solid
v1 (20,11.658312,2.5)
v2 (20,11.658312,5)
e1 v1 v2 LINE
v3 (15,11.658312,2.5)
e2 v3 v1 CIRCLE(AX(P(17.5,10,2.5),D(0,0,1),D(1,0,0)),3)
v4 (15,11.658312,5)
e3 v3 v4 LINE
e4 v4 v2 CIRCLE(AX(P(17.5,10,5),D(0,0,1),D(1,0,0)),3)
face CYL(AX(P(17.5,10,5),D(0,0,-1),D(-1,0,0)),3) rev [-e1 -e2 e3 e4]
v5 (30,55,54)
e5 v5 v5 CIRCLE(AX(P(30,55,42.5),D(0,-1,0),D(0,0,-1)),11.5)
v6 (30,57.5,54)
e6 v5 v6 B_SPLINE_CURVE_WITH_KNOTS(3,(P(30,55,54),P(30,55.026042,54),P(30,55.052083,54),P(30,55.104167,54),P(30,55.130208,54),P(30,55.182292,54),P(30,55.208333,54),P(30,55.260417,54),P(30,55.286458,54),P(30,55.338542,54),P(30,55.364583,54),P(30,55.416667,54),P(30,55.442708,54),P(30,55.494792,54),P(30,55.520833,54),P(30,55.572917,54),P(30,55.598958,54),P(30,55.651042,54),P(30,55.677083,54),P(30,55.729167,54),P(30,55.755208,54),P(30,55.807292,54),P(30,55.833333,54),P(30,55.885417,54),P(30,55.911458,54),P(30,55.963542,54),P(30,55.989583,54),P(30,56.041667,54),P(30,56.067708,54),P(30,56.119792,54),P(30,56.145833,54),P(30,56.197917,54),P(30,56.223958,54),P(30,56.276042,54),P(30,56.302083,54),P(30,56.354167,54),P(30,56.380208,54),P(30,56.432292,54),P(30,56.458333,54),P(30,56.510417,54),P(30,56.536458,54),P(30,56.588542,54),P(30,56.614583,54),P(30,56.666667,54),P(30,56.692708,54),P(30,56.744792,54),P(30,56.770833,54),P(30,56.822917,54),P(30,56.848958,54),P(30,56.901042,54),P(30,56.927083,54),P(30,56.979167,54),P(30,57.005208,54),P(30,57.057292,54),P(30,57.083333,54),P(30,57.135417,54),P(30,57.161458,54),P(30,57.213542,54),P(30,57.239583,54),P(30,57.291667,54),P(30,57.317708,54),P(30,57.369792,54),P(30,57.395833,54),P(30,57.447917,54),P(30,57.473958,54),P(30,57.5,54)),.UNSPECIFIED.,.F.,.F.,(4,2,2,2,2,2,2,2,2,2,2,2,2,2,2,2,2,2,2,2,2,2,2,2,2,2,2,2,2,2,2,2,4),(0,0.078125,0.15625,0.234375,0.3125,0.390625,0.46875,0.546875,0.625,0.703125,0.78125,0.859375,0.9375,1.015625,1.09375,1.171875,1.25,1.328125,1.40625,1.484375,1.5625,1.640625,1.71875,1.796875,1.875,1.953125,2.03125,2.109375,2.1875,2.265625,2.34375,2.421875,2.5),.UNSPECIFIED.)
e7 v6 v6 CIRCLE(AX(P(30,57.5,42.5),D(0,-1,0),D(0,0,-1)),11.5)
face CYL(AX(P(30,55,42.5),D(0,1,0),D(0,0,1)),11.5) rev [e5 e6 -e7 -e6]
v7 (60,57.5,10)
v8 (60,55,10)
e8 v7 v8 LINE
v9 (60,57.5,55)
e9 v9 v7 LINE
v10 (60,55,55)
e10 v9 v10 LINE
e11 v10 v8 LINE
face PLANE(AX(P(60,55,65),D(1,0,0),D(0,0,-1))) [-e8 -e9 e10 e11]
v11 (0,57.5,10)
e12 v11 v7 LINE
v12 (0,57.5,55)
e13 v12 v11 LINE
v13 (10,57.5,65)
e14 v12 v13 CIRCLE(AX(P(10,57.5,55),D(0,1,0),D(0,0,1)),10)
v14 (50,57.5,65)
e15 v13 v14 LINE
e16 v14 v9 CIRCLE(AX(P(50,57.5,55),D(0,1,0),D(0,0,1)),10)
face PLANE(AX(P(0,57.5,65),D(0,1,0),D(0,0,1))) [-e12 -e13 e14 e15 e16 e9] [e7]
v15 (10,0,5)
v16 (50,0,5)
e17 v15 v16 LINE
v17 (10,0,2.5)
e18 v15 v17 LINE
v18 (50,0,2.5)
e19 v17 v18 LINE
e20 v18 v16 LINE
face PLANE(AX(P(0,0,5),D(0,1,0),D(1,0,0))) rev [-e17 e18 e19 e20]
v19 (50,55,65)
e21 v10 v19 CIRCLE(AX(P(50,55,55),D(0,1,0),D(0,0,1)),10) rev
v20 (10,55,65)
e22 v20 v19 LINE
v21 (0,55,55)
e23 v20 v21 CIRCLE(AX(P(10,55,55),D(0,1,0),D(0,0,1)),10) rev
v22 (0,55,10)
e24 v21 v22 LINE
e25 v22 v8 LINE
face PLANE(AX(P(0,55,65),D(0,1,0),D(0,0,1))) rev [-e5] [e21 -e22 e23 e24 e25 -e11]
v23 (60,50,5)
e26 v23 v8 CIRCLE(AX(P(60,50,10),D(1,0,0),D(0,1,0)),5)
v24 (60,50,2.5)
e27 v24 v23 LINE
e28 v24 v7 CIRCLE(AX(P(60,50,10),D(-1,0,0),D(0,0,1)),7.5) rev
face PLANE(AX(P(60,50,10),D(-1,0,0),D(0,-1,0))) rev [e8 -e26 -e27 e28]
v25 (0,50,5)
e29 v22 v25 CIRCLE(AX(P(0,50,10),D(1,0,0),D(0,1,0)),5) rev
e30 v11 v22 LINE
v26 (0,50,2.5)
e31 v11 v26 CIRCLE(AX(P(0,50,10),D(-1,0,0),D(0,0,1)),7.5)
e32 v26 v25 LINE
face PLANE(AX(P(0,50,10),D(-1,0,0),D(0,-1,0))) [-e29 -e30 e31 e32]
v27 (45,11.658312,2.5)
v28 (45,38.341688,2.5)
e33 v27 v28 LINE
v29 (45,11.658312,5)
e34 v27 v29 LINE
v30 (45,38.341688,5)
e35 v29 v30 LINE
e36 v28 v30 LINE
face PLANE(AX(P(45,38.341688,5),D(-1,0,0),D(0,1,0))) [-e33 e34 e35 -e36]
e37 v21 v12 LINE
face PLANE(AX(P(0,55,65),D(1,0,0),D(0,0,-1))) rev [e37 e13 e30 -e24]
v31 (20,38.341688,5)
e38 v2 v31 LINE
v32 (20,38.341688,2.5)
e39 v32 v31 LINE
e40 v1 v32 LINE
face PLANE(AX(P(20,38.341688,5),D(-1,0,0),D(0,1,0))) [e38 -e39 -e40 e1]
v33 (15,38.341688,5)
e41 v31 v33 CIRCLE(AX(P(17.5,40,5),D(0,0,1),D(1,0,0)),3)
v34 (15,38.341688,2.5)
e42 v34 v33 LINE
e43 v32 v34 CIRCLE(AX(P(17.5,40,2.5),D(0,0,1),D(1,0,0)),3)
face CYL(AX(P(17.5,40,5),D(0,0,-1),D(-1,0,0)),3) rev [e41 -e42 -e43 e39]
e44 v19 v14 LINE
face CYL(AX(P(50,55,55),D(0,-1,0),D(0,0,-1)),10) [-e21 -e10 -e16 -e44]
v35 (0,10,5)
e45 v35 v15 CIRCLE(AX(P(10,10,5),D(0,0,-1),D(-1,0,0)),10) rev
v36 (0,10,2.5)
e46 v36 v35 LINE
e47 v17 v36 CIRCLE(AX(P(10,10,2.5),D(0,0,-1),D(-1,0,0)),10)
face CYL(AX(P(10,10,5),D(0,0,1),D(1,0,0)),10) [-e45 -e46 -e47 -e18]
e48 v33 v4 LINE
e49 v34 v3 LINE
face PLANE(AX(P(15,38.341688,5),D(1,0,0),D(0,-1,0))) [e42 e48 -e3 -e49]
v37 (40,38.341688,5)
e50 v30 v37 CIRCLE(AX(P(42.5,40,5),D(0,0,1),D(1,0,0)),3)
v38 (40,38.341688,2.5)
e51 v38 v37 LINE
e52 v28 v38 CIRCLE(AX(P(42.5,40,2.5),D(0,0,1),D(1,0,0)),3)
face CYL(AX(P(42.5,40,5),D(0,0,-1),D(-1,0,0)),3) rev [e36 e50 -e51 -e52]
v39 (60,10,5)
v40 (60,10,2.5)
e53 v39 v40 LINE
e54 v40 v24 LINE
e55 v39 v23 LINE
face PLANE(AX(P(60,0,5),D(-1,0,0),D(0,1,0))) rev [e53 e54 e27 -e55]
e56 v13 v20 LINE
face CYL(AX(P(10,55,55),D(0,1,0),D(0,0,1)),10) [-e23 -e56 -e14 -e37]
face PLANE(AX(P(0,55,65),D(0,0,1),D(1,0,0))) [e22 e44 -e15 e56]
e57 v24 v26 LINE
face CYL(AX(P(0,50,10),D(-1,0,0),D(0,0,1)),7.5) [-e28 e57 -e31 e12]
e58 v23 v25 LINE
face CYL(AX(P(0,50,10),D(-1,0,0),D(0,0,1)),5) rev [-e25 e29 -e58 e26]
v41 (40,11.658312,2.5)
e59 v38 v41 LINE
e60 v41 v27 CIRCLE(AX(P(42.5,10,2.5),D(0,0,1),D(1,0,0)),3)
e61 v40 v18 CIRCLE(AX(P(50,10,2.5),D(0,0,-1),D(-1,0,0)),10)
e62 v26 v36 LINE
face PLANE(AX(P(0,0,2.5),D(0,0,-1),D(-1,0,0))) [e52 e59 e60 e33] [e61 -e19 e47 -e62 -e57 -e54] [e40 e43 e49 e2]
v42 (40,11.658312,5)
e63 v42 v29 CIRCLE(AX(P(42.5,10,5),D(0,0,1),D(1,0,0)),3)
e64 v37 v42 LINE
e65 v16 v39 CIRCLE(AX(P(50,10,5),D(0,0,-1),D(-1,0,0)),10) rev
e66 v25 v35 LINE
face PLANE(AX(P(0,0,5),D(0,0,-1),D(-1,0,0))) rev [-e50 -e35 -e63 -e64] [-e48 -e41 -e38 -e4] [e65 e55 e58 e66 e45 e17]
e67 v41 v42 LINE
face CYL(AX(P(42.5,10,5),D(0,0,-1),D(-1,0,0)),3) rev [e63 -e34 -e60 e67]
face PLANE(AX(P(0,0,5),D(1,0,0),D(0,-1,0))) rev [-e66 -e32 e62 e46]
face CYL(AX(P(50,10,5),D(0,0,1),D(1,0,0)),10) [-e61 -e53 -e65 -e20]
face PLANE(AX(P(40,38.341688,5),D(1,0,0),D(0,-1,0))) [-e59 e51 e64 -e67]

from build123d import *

# Parameters (mm, degrees)
SKETCH2_W              = 60
SKETCH2_H              = 60
BOSS_EXTRUDE1_DEPTH    = 5
SKETCH3_W              = 60
SKETCH3_H              = 5
BOSS_EXTRUDE2_DEPTH    = 60
CUT_EXTRUDE1_REACH     = 106.163
SKETCH4_R              = 11.5
CUT_EXTRUDE2_REACH     = 105.923
CONVERT_SOLID1_DEPTH   = 60
CONVERT_SOLID1_2_DEPTH = 60
FILLET1_R              = 10
FILLET2_R              = 10
FILLET3_R              = 10
FILLET4_R              = 10


# Read off the part's stored shape, not the designer's step: Convert-Solid1
with BuildPart() as part:
    # Sketch2 → Boss-Extrude1 (new body)
    with BuildSketch(Plane.XY):
        with Locations((30, 30)):
            Rectangle(SKETCH2_W, SKETCH2_H)
    extrude(amount=BOSS_EXTRUDE1_DEPTH)

    # Sketch3 → Boss-Extrude2 (add)
    with BuildSketch(Plane.XY.offset(5)):
        with Locations((30, 57.5)):
            Rectangle(SKETCH3_W, SKETCH3_H)
    extrude(amount=BOSS_EXTRUDE2_DEPTH)

    # Sketch4 → Cut-Extrude1 (cut, up to next)
    with BuildSketch(Plane.XZ.offset(-55), mode=Mode.PRIVATE) as cut_extrude1_sk1:
        with Locations(Location((30, 42.5, 0), (0, 0, 270))):
            Circle(SKETCH4_R)
    cut_extrude1_tool1 = extrude(cut_extrude1_sk1.sketch, amount=-CUT_EXTRUDE1_REACH, mode=Mode.PRIVATE) & part.part
    add(cut_extrude1_tool1.solids().sort_by_distance((30, 55, 42.5))[0], mode=Mode.SUBTRACT)

    # Sketch5 → Cut-Extrude2 (cut, up to next)
    with BuildSketch(Plane.XY.offset(5), mode=Mode.PRIVATE) as cut_extrude2_sk1:
        with BuildLine():
            Line((15, 38.341687605), (15, 11.658312395))
            ThreePointArc((15, 11.658312395), (17.5, 7), (20, 11.658312395))
            Line((20, 11.658312395), (20, 38.341687605))
            ThreePointArc((20, 38.341687605), (17.5, 43), (15, 38.341687605))
        make_face()
    cut_extrude2_tool1 = extrude(cut_extrude2_sk1.sketch, amount=-CUT_EXTRUDE2_REACH, mode=Mode.PRIVATE) & part.part
    # Sketch5 → Cut-Extrude2 (cut, up to next)
    with BuildSketch(Plane.XY.offset(5), mode=Mode.PRIVATE) as cut_extrude2_sk2:
        with BuildLine():
            Line((40, 38.341687605), (40, 11.658312395))
            ThreePointArc((40, 11.658312395), (42.5, 7), (45, 11.658312395))
            Line((45, 11.658312395), (45, 38.341687605))
            ThreePointArc((45, 38.341687605), (42.5, 43), (40, 38.341687605))
        make_face()
    cut_extrude2_tool2 = extrude(cut_extrude2_sk2.sketch, amount=-CUT_EXTRUDE2_REACH, mode=Mode.PRIVATE) & part.part
    add(cut_extrude2_tool1.solids().sort_by_distance((17.5, 25, 5))[0], mode=Mode.SUBTRACT)
    add(cut_extrude2_tool2.solids().sort_by_distance((42.5, 25, 5))[0], mode=Mode.SUBTRACT)

    # Convert-Solid1 outline → Convert-Solid1 (cut)
    with BuildSketch(Plane.YZ):
        with BuildLine():
            Line((60, 65), (57.5, 65))
            Line((57.5, 65), (57.5, 10))
            ThreePointArc((57.5, 10), (55.303300859, 4.696699141), (50, 2.5))
            Line((50, 2.5), (0, 2.5))
            Line((0, 2.5), (0, 0))
            Line((0, 0), (60, 0))
            Line((60, 0), (60, 65))
        make_face()
    extrude(amount=CONVERT_SOLID1_DEPTH, mode=Mode.SUBTRACT)

    # Convert-Solid1 2 outline → Convert-Solid1 2 (add)
    with BuildSketch(Plane.YZ):
        with BuildLine():
            Line((55, 5), (55, 10))
            ThreePointArc((55, 10), (53.535533906, 6.464466094), (50, 5))
            Line((50, 5), (55, 5))
        make_face()
    extrude(amount=CONVERT_SOLID1_2_DEPTH)

    # Fillet1
    fillet1_edges = [part.edges().sort_by_distance(p)[0] for p in [
        (60, 56.25, 65),
    ]]
    fillet(fillet1_edges, radius=FILLET1_R)

    # Fillet2
    fillet2_edges = [part.edges().sort_by_distance(p)[0] for p in [
        (0, 56.25, 65),
    ]]
    fillet(fillet2_edges, radius=FILLET2_R)

    # Fillet3
    fillet3_edges = [part.edges().sort_by_distance(p)[0] for p in [
        (0, 0, 3.75),
    ]]
    fillet(fillet3_edges, radius=FILLET3_R)

    # Fillet4
    fillet4_edges = [part.edges().sort_by_distance(p)[0] for p in [
        (60, 0, 3.75),
    ]]
    fillet(fillet4_edges, radius=FILLET4_R)


solid = part.part
